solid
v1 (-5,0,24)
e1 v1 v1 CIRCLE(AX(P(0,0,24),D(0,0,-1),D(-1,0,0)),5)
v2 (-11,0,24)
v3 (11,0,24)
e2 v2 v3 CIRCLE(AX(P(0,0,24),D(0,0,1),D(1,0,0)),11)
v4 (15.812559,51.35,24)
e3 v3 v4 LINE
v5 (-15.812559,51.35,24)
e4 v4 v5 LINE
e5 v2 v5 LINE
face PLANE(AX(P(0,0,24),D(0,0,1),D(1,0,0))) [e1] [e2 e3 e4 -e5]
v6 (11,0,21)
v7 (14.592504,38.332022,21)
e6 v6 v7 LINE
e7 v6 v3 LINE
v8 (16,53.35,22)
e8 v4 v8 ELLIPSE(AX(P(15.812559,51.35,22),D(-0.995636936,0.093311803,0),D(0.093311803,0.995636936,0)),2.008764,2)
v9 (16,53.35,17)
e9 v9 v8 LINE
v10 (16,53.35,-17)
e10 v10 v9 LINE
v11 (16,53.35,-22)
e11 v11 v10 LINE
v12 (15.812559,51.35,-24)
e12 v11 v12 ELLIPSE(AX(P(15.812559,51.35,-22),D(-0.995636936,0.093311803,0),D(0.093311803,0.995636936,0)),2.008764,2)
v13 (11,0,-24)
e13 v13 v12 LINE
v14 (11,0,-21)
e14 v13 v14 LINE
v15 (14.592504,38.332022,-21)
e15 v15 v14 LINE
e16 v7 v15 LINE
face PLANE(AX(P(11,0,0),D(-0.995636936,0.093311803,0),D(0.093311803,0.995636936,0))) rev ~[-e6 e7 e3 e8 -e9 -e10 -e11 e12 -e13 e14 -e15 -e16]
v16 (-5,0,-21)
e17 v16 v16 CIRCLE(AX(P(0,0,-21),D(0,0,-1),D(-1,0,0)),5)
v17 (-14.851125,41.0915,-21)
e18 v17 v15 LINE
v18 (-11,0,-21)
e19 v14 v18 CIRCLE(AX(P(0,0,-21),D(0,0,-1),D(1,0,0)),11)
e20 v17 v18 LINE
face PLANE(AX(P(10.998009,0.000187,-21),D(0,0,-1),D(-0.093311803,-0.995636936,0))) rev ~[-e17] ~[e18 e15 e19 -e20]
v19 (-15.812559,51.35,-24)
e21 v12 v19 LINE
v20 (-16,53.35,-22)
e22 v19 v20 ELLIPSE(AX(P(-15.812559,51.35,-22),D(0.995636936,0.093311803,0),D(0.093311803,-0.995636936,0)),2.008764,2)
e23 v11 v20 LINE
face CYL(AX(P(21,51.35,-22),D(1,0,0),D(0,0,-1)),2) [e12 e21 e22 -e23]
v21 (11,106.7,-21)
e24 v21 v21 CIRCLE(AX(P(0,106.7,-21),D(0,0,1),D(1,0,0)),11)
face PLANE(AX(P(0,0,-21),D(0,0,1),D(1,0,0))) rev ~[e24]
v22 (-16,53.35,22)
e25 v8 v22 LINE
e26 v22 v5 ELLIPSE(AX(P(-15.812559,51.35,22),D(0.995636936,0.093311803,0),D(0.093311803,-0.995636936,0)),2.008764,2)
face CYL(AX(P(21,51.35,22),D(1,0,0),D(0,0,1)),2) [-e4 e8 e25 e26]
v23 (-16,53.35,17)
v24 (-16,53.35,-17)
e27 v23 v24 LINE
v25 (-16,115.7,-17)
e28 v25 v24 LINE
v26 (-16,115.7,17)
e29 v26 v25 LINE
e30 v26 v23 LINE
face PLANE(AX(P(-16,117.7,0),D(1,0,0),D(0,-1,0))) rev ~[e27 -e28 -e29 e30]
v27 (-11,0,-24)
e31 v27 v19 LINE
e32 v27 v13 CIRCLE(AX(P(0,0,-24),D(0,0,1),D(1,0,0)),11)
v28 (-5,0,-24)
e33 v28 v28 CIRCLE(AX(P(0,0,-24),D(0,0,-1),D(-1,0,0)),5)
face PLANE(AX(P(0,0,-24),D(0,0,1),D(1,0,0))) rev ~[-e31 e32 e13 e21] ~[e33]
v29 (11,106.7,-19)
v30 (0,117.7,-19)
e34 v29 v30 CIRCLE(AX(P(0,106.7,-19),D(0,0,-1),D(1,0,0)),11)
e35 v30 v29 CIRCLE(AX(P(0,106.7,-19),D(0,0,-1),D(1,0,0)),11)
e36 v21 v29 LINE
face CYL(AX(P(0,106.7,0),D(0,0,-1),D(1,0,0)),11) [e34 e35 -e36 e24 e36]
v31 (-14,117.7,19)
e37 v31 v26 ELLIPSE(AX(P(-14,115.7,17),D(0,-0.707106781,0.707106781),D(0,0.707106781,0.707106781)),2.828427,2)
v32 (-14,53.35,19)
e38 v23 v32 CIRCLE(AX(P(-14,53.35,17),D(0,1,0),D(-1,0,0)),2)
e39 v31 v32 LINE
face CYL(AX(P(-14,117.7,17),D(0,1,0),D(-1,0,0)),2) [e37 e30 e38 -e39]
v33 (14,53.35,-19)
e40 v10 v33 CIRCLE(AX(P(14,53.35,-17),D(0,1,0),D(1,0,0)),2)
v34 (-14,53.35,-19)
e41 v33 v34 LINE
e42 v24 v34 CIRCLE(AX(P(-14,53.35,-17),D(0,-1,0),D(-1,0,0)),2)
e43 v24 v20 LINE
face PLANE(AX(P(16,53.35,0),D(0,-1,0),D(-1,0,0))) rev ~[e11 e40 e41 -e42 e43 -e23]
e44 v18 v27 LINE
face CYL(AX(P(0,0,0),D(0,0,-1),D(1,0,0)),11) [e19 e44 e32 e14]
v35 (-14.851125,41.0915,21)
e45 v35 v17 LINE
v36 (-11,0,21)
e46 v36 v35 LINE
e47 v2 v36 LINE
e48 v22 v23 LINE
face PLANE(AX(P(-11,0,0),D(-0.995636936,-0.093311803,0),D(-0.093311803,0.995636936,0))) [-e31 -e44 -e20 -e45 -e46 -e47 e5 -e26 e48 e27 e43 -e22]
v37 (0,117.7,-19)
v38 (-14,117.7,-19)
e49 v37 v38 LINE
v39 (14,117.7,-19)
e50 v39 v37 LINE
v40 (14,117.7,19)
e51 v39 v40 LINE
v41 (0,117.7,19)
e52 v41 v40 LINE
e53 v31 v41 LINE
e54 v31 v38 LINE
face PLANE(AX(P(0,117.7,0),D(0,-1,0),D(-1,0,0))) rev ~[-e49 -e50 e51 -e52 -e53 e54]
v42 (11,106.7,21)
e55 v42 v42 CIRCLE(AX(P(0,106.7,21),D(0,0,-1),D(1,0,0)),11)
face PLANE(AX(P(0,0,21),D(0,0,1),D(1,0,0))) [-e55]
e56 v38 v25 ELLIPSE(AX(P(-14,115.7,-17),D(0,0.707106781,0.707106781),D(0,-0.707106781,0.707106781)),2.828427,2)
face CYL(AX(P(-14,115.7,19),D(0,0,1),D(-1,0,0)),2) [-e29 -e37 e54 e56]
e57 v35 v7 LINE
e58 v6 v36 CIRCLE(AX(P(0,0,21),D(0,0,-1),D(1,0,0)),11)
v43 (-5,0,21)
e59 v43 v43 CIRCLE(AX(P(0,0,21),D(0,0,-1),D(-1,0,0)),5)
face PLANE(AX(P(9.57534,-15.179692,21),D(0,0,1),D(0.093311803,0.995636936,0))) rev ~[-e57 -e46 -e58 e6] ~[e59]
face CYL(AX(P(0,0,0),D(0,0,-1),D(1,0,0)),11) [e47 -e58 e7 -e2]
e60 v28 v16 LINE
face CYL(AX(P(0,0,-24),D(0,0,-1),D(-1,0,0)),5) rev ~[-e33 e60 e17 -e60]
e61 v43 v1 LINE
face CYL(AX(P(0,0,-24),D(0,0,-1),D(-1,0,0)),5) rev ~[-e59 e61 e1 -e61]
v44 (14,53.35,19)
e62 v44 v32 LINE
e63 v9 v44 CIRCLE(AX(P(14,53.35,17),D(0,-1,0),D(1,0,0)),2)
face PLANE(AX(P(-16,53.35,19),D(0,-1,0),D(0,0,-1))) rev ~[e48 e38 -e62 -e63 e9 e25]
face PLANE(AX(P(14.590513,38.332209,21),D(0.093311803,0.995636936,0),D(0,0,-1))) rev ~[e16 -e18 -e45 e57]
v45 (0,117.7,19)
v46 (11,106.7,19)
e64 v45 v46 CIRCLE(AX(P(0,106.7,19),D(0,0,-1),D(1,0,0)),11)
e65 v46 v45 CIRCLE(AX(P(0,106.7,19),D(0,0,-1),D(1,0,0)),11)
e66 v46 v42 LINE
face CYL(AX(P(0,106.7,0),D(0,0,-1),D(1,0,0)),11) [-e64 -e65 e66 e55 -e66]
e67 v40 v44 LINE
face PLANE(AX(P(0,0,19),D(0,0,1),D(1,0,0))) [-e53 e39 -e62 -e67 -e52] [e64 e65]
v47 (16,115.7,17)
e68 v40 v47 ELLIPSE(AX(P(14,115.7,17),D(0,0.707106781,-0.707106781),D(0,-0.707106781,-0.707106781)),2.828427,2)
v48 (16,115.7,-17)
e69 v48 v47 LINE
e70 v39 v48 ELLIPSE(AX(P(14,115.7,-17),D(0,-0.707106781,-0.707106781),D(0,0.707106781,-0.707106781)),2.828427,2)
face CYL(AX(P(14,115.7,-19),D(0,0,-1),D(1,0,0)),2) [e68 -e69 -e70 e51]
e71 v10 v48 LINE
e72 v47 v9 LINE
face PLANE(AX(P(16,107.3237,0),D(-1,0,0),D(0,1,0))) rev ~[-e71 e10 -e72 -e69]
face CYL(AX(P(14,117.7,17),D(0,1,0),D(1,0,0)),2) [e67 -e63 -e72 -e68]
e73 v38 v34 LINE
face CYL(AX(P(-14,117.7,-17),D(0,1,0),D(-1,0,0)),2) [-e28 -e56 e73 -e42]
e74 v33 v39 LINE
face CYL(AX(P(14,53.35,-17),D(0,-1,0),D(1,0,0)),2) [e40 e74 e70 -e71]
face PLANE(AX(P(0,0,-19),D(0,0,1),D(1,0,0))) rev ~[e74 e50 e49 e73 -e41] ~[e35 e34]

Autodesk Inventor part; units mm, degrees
ref_plane "YZ Plane" through (0, 0, 0) normal (1, 0, 0) x (0, 1, 0)
ref_plane "XZ Plane" through (0, 0, 0) normal (0, 1, 0) x (-1, 0, 0)
ref_plane "XY Plane" through (0, 0, 0) normal (0, 0, 1) x (1, 0, 0)
sketch "Sketch1" plane through (0, 0, 0) normal (0, 0, 1) x (1, 0, 0)
  circle A0 centre (0, 0) radius 11
  circle A1 centre (0, 106.7) radius 11
  line L0 (16, 106.7) -> (16, 53.35)
  line L1 (16, 107.3237) -> (16, 117.7)
  line L2 (16, 117.7) -> (-16, 117.7)
  line L3 (-16, 117.7) -> (-16, 53.35)
  line L4 (11, 0) -> (16, 53.35)
  line L5 (-11, 0) -> (-16, 53.35)
  line L6 (11, 0) -> (16, 53.35)
  line L7 (16, 53.35) -> (16, 117.7)
  line L8 (-16, 117.7) -> (-16, 53.35)
  line L9 (-11, 0) -> (-16, 53.35)
  line L10 (-16, 117.7) -> (16, 117.7)
  line L11 (16, 53.35) -> (-16, 53.35)
  dimension "d1" = 22
  dimension "d2" = 22
  dimension "d3" = 16
  dimension "d4" = 32
extrude "Extrusion1" add sketch "Sketch1" along normal mid plane 48 contours A0 | A0 L5 L11 L4
extrude "Extrusion2" add sketch "Sketch1" along normal mid plane 38 contours A1 | L11 L3 L2 L1 L7 L0
extrude "Extrusion3" add sketch "Sketch1" along normal mid plane 42 contours A1
fillet "Fillet1" radius 2 8 edges at (16, 117.7, 0) (-16, 117.7, 0) (16, 85.525, 19) (-16, 85.525, 19) (-16, 85.525, -19) (16, 85.525, -19) (0, 53.35, -24) (0, 53.35, 24)
sketch "Sketch2" plane through (11, 0, 24) normal (0.9956369, -0.0933118, 0) x (0, 0, -1)
  ellipse E0 centre (2, 51.575) end of major axis (2, 53.5838) minor radius 2 (2, 53.5838) -> (0, 51.575) ccw projected
  line L0 (48, 0) -> (0, 0) projected
  line L1 (48, 0) -> (48, 51.575) projected
  line L2 (0, 0) -> (3, 0)
  line L3 (3, 0) -> (3, 38.5)
  line L4 (3, 38.5) -> (45, 38.5)
  line L5 (45, 38.5) -> (45, -15.2464)
  line L6 (45, -15.2464) -> (3, -15.2464)
  line L7 (3, -15.2464) -> (3, 0)
  point P0 (24, -1.0264)
  dimension "d12" = 3
  dimension "d13" = 38.5
  dimension "d14" = 42
extrude "Extrusion4" cut sketch "Sketch2" along normal mid plane 100
sketch "Sketch3" plane through (0, 0, -24) normal (0, 0, -1) x (-1, 0, 0)
  arc A0 (-11, 0) -> (11, 0) centre (0, 0) ccw projected
  circle A1 centre (0, 0) radius 5
  dimension "d17" = 10
extrude "Extrusion5" cut sketch "Sketch3" against normal through all
properties part number "Bicep"
